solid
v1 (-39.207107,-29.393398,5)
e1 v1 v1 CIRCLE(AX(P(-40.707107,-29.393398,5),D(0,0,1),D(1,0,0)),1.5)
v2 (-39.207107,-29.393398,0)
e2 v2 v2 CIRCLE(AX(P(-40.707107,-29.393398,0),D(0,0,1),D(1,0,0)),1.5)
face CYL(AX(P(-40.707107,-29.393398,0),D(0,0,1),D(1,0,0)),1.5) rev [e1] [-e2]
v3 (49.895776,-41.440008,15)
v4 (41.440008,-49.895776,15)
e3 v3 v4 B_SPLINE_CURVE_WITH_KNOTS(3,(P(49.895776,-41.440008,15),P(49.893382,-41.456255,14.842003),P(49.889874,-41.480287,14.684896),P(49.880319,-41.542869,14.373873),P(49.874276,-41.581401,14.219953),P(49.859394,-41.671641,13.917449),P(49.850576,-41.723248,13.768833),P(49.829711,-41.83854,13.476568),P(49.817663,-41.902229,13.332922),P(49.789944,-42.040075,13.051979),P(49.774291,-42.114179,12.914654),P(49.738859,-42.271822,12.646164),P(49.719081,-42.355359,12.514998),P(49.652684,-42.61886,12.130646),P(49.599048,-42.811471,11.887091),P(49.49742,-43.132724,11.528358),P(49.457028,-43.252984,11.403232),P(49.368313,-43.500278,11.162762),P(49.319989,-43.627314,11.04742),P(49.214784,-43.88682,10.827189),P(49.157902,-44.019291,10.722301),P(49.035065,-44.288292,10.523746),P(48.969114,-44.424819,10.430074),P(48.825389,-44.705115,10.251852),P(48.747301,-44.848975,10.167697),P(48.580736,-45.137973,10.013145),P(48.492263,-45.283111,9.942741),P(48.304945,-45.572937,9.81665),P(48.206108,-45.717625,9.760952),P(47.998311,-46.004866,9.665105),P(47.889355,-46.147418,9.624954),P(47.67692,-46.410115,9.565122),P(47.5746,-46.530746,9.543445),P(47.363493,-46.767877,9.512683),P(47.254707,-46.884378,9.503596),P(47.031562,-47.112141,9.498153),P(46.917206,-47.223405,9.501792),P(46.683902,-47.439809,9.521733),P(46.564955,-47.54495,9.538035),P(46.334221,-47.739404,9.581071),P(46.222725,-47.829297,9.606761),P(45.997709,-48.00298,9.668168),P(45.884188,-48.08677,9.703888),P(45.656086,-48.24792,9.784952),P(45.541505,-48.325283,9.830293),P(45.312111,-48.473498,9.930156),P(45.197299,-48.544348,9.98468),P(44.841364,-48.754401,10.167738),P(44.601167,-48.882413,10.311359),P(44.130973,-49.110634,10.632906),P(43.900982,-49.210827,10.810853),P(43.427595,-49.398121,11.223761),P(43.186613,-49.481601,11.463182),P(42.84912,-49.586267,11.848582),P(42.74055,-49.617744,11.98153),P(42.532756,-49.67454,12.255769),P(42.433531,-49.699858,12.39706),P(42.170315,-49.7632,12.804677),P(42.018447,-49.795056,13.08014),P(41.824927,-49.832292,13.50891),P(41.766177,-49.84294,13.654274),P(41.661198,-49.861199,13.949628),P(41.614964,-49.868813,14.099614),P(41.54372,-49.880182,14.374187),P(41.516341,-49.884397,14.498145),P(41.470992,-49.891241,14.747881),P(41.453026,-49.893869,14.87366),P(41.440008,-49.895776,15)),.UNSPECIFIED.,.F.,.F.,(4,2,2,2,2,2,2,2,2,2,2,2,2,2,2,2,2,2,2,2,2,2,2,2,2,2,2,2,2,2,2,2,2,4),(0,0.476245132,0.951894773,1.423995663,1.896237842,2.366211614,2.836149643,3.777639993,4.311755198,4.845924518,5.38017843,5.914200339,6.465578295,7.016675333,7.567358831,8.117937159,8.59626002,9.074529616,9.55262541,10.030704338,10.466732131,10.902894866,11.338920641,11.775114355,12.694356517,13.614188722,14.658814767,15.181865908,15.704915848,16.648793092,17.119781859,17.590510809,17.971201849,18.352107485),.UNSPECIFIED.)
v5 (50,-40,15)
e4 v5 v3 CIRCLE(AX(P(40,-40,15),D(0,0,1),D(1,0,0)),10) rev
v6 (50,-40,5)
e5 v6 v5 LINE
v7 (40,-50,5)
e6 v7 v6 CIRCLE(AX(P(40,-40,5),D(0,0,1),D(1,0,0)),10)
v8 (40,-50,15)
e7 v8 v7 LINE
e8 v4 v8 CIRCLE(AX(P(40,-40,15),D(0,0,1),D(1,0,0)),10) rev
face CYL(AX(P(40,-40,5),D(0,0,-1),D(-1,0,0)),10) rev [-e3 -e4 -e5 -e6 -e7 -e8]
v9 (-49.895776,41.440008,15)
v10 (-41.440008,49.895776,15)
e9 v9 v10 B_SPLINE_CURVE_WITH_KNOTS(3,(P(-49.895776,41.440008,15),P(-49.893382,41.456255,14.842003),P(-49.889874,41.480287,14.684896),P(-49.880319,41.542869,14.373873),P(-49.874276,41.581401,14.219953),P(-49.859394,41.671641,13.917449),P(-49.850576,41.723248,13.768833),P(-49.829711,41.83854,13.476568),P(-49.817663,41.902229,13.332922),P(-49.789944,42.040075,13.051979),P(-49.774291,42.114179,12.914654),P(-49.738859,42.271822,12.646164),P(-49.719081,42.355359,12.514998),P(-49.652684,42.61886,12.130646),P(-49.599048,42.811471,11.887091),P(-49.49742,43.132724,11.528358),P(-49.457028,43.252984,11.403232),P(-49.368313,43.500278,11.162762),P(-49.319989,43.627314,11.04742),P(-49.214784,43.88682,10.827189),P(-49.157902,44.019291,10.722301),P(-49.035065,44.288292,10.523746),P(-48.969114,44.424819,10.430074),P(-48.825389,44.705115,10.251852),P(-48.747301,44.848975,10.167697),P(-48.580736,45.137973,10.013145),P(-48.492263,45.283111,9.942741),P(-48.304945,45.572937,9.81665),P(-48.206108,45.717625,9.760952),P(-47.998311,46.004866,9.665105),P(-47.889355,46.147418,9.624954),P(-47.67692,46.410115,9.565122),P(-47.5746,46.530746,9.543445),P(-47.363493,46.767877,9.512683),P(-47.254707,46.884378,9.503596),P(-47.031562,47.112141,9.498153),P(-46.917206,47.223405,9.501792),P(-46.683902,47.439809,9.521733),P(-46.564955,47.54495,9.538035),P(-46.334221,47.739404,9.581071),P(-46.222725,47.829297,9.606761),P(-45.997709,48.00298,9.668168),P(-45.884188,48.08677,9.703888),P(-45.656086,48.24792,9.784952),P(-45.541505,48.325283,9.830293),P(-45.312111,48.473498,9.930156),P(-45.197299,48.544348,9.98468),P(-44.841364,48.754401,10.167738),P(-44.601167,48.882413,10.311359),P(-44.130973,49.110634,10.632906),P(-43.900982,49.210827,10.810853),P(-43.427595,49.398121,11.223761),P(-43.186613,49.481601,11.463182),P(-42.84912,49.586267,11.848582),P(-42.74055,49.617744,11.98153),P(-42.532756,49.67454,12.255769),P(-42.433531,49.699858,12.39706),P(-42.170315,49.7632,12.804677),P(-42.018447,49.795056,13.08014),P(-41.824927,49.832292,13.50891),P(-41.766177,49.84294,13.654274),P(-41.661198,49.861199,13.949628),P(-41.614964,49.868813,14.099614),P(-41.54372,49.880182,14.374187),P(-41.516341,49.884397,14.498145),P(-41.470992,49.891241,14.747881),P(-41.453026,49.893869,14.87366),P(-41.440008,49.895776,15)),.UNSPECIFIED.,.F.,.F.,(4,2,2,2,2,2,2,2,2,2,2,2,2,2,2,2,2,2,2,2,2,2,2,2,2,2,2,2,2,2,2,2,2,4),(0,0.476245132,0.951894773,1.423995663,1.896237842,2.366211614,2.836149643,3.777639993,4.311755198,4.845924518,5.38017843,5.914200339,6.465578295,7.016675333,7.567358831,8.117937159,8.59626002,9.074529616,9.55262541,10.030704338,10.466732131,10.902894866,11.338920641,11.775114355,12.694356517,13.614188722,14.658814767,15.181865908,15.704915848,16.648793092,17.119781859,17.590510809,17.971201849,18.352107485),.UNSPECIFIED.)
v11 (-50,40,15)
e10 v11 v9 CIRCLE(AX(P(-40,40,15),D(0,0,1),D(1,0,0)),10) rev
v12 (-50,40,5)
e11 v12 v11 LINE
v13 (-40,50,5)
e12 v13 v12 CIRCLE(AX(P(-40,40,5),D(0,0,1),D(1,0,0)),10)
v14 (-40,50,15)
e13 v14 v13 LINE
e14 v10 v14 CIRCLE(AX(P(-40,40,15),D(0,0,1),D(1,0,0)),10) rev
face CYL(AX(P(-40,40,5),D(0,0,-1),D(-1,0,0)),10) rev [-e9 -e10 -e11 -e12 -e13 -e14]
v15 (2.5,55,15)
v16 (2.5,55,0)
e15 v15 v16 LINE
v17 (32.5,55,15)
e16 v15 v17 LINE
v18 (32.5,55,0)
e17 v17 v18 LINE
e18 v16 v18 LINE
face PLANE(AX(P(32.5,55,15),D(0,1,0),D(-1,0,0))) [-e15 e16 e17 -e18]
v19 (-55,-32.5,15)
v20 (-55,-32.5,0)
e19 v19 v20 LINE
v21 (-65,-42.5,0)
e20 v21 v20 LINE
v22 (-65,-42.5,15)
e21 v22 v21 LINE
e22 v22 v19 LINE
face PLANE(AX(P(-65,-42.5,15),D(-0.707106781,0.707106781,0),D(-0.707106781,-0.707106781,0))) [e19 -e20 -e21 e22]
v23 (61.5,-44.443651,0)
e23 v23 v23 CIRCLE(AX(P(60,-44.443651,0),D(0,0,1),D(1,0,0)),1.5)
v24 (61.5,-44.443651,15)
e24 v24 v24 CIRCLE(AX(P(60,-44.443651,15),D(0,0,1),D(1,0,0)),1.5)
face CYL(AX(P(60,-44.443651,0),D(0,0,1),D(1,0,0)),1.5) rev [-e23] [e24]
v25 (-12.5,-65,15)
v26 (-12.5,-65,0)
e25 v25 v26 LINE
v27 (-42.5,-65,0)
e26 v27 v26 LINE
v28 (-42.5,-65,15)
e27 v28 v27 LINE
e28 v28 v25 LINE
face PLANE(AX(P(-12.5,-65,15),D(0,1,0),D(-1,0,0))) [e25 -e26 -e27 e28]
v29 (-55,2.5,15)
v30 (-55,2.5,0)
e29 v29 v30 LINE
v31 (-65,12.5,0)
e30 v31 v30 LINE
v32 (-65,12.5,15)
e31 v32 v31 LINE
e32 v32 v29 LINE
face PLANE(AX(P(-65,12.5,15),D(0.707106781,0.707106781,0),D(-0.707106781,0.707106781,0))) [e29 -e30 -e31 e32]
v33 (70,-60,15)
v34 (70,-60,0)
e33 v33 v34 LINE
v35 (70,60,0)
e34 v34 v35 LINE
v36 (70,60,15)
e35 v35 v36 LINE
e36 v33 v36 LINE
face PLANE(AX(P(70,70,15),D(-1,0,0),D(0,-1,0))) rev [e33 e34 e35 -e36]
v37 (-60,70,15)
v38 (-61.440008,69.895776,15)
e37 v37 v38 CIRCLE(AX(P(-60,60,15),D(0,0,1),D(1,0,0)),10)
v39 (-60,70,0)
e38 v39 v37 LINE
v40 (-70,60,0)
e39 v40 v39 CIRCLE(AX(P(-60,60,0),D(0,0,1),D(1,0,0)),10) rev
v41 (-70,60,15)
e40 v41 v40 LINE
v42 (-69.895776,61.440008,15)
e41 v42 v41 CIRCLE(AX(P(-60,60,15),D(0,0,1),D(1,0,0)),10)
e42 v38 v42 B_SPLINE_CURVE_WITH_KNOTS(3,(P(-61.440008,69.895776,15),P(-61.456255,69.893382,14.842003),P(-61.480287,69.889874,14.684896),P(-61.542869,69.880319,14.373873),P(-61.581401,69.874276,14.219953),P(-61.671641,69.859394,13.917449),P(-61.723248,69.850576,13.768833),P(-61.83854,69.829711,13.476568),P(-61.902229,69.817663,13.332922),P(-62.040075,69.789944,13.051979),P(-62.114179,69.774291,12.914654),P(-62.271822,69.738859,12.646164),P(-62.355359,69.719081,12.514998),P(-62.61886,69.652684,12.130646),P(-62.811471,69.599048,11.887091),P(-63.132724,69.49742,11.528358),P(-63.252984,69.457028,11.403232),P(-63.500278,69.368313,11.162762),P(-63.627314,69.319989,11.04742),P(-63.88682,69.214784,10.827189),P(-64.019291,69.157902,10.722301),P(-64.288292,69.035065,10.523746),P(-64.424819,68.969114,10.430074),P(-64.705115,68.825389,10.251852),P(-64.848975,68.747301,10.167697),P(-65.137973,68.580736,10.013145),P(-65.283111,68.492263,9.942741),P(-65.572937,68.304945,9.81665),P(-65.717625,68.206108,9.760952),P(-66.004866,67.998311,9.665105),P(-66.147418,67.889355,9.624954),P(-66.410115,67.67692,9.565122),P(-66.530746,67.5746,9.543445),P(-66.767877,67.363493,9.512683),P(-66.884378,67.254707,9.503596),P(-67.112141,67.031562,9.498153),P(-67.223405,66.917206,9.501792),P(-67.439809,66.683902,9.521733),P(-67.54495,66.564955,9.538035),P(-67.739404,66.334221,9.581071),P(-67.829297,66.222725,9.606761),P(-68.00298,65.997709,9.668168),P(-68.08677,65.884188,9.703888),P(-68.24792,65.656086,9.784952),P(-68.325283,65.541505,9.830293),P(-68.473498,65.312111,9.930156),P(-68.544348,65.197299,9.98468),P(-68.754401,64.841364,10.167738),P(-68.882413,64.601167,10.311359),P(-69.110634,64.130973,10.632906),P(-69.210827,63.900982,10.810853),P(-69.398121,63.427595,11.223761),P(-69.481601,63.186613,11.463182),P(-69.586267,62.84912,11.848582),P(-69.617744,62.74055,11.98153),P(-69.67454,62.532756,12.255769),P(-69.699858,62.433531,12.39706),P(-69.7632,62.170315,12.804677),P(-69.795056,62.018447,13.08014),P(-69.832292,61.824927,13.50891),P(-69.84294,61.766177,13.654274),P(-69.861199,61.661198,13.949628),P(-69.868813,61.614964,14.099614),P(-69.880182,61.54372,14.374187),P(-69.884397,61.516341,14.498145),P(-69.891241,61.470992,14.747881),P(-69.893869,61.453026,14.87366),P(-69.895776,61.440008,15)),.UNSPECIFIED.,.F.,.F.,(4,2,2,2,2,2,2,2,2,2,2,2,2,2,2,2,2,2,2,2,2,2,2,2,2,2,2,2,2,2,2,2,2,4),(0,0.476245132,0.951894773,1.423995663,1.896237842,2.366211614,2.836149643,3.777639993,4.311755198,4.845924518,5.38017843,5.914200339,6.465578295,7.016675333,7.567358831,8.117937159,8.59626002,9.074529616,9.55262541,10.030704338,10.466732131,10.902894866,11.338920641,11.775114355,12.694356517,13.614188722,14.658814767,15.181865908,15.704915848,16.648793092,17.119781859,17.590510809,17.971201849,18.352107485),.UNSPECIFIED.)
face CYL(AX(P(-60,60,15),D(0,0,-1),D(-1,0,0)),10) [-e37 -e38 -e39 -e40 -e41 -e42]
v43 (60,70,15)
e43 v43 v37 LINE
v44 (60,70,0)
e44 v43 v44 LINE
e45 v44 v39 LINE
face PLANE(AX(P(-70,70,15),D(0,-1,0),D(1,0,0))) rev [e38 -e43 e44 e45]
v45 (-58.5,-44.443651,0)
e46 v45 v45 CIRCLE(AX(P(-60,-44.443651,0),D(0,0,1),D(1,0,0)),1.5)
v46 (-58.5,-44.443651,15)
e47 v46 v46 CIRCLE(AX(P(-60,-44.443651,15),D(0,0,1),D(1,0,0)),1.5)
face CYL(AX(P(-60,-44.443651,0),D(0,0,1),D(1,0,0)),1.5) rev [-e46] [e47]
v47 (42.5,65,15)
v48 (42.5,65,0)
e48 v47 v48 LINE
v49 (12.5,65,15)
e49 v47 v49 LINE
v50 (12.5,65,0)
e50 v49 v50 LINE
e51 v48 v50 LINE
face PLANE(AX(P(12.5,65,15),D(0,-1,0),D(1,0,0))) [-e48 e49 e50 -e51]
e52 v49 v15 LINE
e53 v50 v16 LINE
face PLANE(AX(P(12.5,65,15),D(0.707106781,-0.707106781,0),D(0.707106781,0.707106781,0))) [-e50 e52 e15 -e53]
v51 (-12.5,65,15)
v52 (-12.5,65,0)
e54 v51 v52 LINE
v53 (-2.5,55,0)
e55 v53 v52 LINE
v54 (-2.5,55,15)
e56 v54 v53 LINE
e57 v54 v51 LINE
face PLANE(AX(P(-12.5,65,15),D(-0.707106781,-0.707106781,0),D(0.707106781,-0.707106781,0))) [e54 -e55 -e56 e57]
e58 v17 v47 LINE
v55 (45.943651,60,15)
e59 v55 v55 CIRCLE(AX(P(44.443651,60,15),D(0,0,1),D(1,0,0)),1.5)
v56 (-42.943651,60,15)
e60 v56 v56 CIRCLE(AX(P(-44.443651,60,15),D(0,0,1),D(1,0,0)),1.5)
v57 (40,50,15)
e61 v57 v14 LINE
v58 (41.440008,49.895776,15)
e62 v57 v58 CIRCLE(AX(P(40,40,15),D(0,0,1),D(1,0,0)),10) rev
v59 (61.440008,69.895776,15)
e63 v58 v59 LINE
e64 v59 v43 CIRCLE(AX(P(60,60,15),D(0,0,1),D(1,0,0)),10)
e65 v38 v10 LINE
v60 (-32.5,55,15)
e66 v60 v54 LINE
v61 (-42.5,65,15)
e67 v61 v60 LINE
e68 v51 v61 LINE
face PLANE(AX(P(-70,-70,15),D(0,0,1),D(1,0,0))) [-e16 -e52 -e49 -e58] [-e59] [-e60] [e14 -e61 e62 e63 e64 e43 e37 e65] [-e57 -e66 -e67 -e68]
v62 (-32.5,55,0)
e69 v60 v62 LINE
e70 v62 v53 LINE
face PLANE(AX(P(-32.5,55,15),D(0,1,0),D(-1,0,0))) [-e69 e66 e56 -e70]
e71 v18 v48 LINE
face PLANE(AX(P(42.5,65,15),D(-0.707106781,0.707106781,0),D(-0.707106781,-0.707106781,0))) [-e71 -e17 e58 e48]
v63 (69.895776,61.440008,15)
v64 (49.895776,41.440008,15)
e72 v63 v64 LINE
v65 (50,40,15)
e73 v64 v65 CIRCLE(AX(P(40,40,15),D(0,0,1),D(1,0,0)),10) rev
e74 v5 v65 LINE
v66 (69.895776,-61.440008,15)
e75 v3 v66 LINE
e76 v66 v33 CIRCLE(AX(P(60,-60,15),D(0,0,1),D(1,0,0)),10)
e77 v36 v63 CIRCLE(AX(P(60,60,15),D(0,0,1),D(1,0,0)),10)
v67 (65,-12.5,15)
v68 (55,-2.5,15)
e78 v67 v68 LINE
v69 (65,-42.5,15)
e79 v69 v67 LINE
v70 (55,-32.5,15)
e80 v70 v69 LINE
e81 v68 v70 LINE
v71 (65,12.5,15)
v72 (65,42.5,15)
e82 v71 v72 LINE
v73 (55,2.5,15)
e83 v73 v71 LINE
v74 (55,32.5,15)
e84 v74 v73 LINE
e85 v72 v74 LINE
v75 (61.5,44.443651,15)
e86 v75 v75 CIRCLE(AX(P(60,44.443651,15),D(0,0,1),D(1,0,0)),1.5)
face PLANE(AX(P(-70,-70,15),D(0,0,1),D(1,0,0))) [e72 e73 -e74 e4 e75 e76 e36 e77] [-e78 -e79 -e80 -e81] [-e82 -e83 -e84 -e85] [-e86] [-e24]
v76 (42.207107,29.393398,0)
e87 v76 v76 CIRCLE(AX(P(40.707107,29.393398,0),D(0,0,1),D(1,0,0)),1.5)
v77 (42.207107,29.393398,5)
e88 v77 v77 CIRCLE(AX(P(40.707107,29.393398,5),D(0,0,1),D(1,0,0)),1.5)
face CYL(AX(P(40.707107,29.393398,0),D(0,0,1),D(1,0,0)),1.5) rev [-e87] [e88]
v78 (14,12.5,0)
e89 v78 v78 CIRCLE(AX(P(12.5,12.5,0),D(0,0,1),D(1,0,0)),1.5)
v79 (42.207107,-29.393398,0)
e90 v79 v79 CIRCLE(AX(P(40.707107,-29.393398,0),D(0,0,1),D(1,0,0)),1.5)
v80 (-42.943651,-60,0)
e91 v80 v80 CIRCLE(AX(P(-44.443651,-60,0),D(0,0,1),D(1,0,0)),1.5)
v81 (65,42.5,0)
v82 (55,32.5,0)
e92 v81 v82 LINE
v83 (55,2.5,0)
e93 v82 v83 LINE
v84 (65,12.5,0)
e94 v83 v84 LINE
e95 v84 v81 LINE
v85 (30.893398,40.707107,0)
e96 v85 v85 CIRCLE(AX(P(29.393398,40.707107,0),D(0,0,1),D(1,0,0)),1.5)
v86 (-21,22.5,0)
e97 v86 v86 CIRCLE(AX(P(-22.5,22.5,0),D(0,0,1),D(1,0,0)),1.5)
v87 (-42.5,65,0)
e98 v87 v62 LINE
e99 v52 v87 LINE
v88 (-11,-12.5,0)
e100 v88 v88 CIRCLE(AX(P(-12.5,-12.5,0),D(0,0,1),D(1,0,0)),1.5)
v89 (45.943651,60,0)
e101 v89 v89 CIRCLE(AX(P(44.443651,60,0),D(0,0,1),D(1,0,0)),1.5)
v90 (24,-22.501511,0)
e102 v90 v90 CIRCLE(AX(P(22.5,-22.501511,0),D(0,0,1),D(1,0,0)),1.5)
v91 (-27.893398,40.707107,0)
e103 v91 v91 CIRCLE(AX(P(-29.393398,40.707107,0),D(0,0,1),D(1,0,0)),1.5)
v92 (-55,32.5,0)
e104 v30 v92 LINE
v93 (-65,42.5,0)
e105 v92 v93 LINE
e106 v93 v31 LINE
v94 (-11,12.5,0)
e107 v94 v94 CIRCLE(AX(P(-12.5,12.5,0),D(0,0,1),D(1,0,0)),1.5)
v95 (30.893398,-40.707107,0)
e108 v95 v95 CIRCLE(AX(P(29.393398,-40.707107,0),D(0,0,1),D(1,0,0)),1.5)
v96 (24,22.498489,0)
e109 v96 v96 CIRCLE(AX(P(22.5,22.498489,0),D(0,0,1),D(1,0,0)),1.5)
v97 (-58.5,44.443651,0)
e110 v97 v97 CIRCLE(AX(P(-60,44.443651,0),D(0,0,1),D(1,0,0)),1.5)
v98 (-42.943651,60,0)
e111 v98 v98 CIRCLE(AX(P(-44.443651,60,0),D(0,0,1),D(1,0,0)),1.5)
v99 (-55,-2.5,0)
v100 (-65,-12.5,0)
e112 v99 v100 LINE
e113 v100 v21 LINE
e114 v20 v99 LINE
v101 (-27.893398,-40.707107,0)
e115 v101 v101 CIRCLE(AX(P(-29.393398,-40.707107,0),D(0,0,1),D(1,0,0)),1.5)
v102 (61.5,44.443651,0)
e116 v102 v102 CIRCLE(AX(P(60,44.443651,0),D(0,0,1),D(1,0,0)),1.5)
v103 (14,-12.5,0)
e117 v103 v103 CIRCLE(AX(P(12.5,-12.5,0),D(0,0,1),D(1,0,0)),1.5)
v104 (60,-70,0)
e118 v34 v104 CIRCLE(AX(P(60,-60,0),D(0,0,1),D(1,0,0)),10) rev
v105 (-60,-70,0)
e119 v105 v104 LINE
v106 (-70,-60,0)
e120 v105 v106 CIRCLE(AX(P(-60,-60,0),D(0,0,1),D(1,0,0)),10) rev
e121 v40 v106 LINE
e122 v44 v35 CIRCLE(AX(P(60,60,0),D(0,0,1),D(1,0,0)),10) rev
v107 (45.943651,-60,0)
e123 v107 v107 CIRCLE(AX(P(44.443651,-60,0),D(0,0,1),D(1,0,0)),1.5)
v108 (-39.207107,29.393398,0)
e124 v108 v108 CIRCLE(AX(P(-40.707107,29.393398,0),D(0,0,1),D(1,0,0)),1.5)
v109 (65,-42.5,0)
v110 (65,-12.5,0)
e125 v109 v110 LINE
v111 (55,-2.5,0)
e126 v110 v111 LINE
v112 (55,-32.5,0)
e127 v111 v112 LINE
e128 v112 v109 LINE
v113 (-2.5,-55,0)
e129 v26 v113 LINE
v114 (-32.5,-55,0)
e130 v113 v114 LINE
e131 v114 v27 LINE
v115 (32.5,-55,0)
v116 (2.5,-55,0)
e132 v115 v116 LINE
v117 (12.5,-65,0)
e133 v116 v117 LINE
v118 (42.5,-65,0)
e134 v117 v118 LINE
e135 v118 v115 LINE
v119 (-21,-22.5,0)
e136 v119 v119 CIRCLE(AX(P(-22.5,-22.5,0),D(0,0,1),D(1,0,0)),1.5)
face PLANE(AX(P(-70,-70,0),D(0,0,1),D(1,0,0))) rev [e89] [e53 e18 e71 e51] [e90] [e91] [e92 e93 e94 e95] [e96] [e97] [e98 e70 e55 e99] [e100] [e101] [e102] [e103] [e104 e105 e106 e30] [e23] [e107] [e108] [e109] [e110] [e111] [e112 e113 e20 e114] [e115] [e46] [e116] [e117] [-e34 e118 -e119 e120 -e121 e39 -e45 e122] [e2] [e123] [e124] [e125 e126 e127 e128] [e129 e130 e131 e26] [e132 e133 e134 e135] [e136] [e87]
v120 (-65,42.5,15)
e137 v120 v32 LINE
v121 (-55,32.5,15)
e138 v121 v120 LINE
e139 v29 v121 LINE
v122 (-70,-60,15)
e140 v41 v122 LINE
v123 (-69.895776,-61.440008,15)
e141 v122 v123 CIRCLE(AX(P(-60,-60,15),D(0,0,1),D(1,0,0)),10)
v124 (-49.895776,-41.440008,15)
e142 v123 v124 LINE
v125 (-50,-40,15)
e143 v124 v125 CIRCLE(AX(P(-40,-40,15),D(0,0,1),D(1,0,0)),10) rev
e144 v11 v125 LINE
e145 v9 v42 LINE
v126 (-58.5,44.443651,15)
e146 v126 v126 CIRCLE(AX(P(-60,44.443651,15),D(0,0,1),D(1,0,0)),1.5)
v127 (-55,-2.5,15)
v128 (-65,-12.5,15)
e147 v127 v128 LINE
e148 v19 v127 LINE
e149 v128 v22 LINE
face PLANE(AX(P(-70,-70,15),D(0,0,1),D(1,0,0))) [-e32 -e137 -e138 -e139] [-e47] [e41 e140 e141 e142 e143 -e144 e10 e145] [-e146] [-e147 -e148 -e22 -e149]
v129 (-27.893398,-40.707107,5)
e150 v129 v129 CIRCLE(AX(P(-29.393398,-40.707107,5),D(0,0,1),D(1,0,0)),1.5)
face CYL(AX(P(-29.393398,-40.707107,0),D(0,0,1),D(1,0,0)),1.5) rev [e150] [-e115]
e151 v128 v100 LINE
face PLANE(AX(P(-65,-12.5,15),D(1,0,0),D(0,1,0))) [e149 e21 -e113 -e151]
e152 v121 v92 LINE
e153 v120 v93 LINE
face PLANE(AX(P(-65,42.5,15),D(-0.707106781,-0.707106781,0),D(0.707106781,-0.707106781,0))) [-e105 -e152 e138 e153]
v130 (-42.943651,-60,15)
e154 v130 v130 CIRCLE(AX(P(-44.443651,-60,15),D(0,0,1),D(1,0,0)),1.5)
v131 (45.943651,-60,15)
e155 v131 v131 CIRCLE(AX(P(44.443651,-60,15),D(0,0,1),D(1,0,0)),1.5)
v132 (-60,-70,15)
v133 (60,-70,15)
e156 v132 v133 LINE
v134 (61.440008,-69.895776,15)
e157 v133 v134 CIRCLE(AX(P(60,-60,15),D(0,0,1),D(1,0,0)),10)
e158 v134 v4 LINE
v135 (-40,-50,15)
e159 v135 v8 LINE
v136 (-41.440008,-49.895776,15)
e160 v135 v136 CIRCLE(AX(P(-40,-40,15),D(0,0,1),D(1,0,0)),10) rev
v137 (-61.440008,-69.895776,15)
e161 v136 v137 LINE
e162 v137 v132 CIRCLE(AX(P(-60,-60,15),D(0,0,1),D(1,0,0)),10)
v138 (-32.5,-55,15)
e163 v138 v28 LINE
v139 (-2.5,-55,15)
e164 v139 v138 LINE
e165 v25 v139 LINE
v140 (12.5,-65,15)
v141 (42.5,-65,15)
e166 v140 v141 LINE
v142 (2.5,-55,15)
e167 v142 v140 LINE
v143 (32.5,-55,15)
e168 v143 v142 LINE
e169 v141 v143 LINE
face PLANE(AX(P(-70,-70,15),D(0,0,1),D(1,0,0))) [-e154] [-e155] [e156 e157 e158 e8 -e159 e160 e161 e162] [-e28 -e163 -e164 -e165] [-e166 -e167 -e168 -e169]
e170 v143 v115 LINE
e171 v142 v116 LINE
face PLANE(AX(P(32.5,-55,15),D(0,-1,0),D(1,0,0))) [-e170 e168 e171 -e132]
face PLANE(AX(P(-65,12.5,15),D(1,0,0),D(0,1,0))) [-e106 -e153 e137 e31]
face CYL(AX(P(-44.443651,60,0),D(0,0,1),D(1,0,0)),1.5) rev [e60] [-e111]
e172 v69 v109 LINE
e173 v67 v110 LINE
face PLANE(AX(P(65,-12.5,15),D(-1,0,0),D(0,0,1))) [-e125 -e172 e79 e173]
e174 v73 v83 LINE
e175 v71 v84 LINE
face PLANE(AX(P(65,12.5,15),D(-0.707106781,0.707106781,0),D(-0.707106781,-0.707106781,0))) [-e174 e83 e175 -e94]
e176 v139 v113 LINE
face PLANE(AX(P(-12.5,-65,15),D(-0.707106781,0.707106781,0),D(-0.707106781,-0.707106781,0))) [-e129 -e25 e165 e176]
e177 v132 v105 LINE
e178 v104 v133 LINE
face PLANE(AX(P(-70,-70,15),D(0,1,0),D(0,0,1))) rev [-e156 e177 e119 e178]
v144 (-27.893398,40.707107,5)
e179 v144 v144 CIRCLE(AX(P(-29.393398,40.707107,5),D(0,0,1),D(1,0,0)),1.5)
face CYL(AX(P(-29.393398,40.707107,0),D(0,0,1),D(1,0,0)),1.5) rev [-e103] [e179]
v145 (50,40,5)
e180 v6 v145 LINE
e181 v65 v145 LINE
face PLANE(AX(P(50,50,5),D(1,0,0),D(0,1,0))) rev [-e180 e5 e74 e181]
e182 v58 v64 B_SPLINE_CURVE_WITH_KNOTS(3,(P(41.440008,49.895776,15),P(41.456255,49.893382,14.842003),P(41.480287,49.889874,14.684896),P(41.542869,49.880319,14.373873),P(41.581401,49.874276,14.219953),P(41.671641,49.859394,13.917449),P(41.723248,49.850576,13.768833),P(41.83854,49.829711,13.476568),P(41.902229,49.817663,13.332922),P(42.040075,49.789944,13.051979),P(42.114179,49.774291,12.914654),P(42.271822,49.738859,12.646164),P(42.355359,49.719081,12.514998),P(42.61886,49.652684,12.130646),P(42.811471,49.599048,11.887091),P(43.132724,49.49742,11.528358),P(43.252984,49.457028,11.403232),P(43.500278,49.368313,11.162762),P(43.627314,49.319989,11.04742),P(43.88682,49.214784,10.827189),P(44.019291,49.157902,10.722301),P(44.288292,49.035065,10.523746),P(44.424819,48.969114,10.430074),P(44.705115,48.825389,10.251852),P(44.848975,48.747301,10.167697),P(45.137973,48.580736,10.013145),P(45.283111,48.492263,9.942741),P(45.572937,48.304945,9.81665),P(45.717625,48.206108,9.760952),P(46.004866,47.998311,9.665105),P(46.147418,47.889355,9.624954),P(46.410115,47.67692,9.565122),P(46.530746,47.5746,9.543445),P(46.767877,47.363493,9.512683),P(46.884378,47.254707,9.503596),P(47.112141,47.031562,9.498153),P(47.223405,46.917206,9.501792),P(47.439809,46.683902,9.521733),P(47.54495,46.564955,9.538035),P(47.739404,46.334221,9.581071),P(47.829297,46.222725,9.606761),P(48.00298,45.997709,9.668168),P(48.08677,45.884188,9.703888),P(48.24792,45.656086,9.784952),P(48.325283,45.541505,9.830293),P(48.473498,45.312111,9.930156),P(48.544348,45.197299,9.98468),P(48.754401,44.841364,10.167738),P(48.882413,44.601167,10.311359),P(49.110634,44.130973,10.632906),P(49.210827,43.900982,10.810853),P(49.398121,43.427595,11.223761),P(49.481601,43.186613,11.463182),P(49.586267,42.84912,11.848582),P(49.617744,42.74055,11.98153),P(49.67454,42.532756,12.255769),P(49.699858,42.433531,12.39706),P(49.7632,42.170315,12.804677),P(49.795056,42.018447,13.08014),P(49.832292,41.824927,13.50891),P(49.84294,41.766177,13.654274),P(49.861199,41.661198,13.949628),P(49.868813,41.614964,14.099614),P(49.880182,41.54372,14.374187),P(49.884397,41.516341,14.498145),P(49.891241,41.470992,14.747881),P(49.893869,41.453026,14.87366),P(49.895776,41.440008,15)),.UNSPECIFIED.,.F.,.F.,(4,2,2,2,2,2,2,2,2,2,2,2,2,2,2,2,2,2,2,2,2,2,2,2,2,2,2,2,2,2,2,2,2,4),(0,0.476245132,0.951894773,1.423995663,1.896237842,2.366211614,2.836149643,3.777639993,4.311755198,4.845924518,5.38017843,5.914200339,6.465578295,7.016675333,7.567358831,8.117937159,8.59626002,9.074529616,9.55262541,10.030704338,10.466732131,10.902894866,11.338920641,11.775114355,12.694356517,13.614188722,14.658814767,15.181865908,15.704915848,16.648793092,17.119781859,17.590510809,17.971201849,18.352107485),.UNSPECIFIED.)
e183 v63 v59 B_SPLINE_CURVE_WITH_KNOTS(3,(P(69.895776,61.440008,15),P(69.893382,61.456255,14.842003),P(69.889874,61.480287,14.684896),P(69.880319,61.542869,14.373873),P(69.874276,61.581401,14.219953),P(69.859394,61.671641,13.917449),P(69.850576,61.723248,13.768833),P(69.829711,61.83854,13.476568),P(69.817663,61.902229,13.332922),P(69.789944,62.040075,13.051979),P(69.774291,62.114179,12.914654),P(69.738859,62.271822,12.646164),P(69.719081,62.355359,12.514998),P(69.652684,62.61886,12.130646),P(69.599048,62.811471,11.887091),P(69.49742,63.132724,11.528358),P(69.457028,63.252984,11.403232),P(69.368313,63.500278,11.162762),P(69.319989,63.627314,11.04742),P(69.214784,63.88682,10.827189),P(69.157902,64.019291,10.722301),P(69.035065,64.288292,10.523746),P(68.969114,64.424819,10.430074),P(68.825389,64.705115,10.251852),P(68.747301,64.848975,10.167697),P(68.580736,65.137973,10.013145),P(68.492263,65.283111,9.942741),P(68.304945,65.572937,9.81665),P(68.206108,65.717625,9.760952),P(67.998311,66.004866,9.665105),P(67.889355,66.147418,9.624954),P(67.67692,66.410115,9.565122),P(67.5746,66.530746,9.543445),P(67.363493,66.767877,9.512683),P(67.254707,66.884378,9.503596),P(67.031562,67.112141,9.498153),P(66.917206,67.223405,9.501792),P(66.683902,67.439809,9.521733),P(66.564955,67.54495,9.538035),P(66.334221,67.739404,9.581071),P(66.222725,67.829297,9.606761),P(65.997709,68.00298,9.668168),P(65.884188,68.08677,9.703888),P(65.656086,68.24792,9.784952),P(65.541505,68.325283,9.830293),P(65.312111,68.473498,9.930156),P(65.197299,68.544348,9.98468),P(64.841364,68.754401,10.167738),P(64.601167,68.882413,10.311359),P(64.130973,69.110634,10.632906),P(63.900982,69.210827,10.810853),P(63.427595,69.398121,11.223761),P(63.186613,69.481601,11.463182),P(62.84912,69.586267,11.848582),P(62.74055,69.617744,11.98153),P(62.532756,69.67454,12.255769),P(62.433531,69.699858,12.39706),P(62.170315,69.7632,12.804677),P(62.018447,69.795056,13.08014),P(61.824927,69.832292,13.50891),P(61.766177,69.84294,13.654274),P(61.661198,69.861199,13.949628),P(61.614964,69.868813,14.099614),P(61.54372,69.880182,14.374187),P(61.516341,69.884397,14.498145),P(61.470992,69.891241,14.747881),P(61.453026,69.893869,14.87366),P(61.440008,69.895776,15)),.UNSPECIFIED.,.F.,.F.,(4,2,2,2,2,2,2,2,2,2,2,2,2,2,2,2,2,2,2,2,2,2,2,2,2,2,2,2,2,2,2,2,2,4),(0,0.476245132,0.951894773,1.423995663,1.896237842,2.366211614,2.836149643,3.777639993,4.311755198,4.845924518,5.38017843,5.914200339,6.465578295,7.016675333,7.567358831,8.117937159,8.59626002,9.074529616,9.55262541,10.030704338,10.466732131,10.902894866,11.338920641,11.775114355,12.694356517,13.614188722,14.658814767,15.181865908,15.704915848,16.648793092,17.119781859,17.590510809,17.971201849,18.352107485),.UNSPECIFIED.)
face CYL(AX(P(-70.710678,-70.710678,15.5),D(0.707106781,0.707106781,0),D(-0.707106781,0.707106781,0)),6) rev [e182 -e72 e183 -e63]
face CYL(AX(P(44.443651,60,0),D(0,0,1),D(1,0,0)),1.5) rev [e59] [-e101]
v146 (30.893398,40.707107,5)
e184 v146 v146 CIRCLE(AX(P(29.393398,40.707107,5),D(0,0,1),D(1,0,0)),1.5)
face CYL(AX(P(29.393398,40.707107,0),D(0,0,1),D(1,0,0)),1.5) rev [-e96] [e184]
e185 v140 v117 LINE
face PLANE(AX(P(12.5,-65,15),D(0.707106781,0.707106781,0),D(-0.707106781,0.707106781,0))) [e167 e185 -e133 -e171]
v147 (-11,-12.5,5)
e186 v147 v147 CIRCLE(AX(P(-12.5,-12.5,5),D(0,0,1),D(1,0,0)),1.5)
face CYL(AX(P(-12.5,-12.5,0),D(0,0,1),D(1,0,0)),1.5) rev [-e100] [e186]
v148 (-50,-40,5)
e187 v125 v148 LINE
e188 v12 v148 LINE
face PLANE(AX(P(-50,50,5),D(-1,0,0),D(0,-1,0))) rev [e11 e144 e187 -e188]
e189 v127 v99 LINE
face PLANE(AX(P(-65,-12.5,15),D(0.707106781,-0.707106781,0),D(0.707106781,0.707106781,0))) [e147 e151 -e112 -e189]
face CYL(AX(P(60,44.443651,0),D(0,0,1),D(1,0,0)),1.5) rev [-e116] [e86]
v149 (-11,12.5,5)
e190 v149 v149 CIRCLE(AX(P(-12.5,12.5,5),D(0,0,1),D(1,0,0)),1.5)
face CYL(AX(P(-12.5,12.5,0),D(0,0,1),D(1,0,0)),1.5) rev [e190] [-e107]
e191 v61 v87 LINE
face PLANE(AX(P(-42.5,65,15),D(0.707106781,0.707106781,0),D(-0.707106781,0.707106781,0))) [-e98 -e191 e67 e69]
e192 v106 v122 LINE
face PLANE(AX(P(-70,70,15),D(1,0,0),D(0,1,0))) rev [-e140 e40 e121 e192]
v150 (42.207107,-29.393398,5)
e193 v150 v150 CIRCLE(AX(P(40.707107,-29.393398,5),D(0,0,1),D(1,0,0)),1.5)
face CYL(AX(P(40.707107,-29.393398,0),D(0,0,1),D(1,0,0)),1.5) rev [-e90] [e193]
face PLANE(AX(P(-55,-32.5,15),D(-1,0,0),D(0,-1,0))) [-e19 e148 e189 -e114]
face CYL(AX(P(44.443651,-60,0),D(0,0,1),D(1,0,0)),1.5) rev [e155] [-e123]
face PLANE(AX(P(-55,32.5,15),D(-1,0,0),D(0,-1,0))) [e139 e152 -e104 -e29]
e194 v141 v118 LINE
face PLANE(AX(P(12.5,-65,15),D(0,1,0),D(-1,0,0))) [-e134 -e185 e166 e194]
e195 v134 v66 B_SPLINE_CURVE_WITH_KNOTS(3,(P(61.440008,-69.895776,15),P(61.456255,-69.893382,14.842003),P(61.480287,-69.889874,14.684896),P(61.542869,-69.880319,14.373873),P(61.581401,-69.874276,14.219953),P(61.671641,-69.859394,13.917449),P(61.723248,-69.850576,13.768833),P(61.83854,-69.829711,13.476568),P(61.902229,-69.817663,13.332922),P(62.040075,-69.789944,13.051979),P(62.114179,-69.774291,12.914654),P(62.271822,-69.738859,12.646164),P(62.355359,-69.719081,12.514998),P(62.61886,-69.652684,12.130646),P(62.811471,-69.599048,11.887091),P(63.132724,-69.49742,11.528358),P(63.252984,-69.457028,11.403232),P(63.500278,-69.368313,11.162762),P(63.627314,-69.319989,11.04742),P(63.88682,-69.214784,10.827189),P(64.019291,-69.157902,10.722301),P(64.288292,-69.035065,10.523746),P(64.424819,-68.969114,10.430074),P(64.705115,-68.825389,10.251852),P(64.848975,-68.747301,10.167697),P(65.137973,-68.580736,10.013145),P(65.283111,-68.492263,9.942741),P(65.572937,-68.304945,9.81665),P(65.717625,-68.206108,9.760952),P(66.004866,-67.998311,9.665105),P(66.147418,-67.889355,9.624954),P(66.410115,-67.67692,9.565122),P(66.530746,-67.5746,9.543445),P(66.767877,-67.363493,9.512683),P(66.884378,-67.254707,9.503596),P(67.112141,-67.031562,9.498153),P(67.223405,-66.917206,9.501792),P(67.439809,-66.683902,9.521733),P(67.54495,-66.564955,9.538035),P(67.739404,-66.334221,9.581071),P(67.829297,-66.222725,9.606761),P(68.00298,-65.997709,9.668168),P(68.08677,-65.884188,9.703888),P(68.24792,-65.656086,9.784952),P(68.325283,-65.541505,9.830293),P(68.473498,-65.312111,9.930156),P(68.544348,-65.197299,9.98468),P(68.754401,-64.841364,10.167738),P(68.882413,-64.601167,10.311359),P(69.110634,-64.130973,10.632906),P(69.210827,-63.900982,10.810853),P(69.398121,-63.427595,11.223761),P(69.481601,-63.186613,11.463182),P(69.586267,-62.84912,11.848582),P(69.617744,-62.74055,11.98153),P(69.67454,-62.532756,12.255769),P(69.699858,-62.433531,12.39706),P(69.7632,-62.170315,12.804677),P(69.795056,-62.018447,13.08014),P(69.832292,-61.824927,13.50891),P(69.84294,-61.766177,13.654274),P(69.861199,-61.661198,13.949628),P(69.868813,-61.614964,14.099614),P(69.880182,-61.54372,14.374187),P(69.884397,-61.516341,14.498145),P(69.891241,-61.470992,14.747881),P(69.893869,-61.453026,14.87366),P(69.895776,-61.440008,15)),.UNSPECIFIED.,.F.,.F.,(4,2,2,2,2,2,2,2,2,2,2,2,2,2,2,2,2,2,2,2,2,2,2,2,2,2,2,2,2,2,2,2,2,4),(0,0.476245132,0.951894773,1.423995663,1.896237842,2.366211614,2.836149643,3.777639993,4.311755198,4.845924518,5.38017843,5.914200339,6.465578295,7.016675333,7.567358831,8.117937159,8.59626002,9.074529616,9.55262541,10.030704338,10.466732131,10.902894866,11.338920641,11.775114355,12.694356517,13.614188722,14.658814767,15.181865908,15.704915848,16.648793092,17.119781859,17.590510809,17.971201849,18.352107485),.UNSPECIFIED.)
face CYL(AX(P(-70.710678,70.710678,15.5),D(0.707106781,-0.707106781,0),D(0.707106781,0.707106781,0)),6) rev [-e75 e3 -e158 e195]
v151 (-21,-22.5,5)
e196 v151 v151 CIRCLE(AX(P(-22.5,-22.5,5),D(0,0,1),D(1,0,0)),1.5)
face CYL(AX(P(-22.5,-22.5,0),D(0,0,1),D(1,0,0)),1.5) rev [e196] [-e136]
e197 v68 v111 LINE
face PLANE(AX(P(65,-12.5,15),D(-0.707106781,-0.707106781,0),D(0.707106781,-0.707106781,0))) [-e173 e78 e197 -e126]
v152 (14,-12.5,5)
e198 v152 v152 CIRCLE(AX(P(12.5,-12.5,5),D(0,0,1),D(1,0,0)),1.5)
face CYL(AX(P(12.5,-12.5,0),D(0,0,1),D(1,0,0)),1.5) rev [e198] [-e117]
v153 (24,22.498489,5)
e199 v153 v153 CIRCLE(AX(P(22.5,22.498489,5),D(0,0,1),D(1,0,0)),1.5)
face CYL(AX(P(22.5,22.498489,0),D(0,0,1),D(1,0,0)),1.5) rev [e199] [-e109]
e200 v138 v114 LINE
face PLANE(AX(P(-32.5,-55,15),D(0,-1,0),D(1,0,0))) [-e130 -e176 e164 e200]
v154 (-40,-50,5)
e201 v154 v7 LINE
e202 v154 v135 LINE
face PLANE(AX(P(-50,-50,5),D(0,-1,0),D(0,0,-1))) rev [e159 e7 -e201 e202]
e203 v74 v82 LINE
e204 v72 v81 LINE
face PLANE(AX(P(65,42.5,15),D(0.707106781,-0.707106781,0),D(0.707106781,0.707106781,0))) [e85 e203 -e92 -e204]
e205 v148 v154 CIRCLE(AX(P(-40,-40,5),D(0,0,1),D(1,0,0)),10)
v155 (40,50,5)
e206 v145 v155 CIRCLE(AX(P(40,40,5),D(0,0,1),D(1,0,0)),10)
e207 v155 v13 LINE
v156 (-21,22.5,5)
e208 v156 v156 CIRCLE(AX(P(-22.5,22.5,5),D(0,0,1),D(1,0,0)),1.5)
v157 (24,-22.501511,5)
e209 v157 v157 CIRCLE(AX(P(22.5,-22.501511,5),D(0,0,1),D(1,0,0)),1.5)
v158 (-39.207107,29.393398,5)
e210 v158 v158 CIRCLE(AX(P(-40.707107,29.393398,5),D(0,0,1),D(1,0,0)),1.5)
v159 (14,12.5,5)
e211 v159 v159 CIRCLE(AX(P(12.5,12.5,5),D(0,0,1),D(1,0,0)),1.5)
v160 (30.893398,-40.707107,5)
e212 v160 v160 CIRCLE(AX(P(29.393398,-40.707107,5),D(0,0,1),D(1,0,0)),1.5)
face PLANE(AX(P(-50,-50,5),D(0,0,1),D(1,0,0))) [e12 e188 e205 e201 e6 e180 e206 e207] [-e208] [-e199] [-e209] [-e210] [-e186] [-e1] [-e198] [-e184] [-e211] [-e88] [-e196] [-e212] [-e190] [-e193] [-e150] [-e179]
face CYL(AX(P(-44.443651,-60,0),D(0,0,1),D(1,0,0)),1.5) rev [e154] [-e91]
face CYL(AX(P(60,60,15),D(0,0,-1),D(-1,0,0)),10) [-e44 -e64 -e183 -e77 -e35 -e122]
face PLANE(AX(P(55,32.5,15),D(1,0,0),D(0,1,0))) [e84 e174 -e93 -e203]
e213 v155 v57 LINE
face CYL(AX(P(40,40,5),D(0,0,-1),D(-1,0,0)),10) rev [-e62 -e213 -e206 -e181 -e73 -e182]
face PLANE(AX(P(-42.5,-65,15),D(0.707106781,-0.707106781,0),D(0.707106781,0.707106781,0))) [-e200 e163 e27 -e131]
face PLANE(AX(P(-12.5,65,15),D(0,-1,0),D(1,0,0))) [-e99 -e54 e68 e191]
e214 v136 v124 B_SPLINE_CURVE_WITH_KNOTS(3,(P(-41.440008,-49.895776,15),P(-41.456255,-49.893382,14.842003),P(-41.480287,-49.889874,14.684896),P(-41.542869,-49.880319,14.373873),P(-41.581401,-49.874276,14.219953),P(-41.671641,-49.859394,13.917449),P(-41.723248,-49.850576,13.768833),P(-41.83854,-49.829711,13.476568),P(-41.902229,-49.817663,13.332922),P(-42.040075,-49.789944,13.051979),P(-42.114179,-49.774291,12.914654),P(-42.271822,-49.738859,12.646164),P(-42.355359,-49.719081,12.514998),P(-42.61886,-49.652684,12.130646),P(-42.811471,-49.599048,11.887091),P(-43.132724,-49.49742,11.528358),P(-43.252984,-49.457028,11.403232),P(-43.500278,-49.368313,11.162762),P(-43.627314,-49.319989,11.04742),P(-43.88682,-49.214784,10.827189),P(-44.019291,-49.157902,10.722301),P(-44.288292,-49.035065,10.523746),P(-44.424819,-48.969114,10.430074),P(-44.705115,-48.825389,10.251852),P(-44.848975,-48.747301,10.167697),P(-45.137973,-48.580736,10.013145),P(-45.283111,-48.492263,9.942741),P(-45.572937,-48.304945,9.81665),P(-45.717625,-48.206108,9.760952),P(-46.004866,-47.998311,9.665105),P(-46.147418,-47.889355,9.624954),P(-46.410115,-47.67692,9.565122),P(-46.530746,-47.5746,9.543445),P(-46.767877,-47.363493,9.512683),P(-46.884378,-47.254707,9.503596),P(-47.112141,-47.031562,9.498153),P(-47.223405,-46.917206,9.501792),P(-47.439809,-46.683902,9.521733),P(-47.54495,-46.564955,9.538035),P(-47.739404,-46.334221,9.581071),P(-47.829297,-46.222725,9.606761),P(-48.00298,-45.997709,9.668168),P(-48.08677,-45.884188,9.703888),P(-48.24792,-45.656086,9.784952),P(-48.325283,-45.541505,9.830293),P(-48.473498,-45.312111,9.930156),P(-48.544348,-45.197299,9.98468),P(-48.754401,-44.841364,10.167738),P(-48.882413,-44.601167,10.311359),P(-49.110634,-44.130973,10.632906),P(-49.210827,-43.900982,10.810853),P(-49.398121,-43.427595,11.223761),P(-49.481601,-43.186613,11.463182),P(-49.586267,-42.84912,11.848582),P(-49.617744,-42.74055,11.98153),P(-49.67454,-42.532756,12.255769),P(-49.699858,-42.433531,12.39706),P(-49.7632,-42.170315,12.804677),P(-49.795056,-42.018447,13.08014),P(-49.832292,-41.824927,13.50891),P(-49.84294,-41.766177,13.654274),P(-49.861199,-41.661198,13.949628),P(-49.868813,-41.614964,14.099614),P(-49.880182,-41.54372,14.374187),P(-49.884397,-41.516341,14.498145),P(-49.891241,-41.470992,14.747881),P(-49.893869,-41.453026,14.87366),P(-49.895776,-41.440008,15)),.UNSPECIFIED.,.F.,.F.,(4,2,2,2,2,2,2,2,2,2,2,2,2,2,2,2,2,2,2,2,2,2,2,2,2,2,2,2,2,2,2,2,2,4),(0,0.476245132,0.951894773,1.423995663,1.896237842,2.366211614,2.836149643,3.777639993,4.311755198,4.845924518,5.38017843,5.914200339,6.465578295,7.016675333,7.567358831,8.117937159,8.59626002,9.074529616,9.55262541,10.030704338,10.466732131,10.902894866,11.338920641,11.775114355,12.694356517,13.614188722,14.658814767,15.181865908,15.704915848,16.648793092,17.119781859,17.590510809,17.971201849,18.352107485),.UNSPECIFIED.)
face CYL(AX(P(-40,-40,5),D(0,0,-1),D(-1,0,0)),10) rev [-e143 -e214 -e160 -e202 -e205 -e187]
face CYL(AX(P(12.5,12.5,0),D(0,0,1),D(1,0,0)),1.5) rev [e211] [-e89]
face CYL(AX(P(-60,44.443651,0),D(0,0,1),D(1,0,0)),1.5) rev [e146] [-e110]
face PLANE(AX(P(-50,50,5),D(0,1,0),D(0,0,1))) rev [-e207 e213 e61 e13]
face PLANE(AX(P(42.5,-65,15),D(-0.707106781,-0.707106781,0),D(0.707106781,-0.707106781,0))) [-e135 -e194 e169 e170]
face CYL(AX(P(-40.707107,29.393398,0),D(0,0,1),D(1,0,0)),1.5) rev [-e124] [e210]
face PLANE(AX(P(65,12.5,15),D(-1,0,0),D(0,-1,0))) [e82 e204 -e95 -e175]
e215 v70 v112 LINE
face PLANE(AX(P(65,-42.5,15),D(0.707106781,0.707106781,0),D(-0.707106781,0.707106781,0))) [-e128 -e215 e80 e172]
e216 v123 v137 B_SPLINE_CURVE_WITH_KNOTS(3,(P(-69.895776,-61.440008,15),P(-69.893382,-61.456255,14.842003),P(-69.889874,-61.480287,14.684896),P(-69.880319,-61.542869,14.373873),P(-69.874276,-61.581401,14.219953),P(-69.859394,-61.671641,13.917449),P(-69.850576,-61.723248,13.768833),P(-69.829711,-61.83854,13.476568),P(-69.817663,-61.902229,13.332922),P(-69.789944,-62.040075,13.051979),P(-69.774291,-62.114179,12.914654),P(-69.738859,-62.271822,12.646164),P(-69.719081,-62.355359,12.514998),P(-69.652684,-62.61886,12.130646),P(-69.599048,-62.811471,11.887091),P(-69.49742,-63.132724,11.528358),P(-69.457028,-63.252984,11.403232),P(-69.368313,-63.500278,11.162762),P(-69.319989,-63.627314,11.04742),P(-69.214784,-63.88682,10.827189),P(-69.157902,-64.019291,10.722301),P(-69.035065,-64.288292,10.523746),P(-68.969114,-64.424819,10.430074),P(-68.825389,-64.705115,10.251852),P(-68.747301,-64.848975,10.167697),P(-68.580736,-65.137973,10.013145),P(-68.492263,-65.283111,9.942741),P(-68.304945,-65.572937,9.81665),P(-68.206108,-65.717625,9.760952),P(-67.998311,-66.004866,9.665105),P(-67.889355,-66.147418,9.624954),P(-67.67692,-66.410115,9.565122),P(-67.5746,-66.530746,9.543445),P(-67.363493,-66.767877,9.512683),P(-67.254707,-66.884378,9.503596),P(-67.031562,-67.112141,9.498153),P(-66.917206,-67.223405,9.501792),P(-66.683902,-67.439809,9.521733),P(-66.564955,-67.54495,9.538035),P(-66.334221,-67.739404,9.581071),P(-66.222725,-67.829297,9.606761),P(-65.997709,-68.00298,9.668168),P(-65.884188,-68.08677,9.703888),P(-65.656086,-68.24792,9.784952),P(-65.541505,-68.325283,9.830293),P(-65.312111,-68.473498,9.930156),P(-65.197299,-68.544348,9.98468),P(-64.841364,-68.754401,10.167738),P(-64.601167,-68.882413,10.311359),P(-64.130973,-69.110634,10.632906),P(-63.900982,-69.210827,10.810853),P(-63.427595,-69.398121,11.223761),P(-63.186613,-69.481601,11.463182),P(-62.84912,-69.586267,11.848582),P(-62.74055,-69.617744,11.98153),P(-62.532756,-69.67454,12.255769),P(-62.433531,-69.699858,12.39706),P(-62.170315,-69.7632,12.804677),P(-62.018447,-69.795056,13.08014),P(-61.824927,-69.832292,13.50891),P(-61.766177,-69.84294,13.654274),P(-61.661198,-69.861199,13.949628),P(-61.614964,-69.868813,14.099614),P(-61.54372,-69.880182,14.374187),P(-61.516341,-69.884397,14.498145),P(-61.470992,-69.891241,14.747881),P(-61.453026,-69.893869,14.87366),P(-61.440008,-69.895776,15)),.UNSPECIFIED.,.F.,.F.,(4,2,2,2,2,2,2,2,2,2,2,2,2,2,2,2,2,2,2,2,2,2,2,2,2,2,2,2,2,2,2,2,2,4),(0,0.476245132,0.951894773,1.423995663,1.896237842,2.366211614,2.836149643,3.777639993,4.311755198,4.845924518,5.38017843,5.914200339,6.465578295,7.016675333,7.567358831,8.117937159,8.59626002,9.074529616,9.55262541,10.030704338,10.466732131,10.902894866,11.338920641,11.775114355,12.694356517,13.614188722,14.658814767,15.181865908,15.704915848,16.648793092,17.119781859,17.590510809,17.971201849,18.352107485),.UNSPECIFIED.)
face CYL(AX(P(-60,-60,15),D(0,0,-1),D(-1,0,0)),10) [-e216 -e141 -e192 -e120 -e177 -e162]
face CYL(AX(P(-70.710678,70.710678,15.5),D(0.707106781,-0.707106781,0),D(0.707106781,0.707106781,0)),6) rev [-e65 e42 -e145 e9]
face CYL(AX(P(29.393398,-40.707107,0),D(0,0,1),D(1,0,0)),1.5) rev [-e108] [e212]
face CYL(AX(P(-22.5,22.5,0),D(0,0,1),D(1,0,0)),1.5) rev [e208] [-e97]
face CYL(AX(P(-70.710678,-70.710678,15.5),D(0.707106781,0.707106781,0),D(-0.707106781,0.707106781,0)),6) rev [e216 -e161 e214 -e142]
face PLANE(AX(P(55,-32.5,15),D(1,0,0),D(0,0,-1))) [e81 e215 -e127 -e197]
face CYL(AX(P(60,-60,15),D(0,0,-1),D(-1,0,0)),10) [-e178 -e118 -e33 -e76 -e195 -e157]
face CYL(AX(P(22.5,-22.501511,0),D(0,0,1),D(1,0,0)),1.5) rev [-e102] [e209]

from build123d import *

# Parameters (mm, degrees)
ESQUISSE1_W                  = 140
ESQUISSE1_H                  = 140
BOSS_EXTRU_1_DEPTH           = 15
ESQUISSE4_W                  = 100
ESQUISSE4_H                  = 100
ENL_V_MAT_EXTRU_3_DEPTH      = 10
ENL_V_MAT_EXTRU_1_DEPTH      = 100
R_P_TITION_CIRCULAIRE1_COUNT = 2
R_P_TITION_CIRCULAIRE1_ANGLE = 90
CONG_1_R                     = 10
ESQUISSE3_R                  = 1.5
ENL_V_MAT_EXTRU_2_DEPTH      = 15
ESQUISSE5_R                  = 1.5
ENL_V_MAT_EXTRU_4_DEPTH      = 5


with BuildPart() as part:
    # Esquisse1 → Boss.-Extru.1 (new body)
    with BuildSketch(Plane.XY):
        Rectangle(ESQUISSE1_W, ESQUISSE1_H)
        Polygon((65, 12.5), (55, 2.5), (55, 32.5), (65, 42.5), align=None, mode=Mode.SUBTRACT)
        Polygon((65, -12.5), (55, -2.5), (55, -32.5), (65, -42.5), align=None, mode=Mode.SUBTRACT)
        Polygon((12.5, -65), (2.5, -55), (32.5, -55), (42.5, -65), align=None, mode=Mode.SUBTRACT)
        Polygon((-12.5, -65), (-2.5, -55), (-32.5, -55), (-42.5, -65), align=None, mode=Mode.SUBTRACT)
        Polygon((-65, -12.5), (-55, -2.5), (-55, -32.5), (-65, -42.5), align=None, mode=Mode.SUBTRACT)
        Polygon((-65, 12.5), (-55, 2.5), (-55, 32.5), (-65, 42.5), align=None, mode=Mode.SUBTRACT)
        Polygon((-12.5, 65), (-2.5, 55), (-32.5, 55), (-42.5, 65), align=None, mode=Mode.SUBTRACT)
        Polygon((12.5, 65), (2.5, 55), (32.5, 55), (42.5, 65), align=None, mode=Mode.SUBTRACT)
    extrude(amount=BOSS_EXTRU_1_DEPTH)

    # Esquisse4 → Enlèv. mat.-Extru.3 (cut)
    with BuildSketch(Plane.XY.offset(15)):
        Rectangle(ESQUISSE4_W, ESQUISSE4_H)
    extrude(amount=-ENL_V_MAT_EXTRU_3_DEPTH, mode=Mode.SUBTRACT)

    # Esquisse2 → Enlèv. mat.-Extru.1 (cut, symmetric)
    with BuildSketch(Plane(origin=(0, 0, 0), x_dir=(-0.7071067811865475, -0.7071067811865477, 0), z_dir=(-0.7071067811865477, 0.7071067811865475, 0))):
        with BuildLine():
            Line((-6, 15.5), (6, 15.5))
            ThreePointArc((6, 15.5), (0, 9.5), (-6, 15.5))
        make_face()
    enl_v_mat_extru_1 = extrude(amount=ENL_V_MAT_EXTRU_1_DEPTH, both=True, mode=Mode.SUBTRACT)

    # Répétition circulaire1: Enlèv. mat.-Extru.1 ×2 about axis
    r_p_tition_circulaire1_axis = Axis((0, 0, -62.841973852), (0, 0, 1))
    for i in range(1, R_P_TITION_CIRCULAIRE1_COUNT):
        add(enl_v_mat_extru_1.rotate(r_p_tition_circulaire1_axis, i * R_P_TITION_CIRCULAIRE1_ANGLE / (R_P_TITION_CIRCULAIRE1_COUNT - 1)), mode=Mode.SUBTRACT)

    # Congé1
    cong_1_edges = [part.edges().sort_by_distance(p)[0] for p in [
        (50, -50, 7.25),
        (-50, -50, 7.25),
        (50, 50, 7.25),
        (-50, 50, 7.25),
    ]]
    fillet(cong_1_edges, radius=CONG_1_R)
    cong_1_2_edges = [part.edges().sort_by_distance(p)[0] for p in [
        (-70, 70, 4.75),
        (-70, -70, 4.75),
        (70, 70, 4.75),
        (70, -70, 4.75),
    ]]
    fillet(cong_1_2_edges, radius=CONG_1_R)

    # Esquisse3 → Enlèv. mat.-Extru.2 (cut)
    with BuildSketch(Plane.XY.offset(15)):
        with Locations((-60, -44.443650814)):
            Circle(ESQUISSE3_R)
        with Locations((-44.443650814, -60)):
            Circle(ESQUISSE3_R)
        with Locations((-44.443650814, 60)):
            Circle(ESQUISSE3_R)
        with Locations((-60, 44.443650814)):
            Circle(ESQUISSE3_R)
        with Locations((60, 44.443650814)):
            Circle(ESQUISSE3_R)
        with Locations((44.443650814, 60)):
            Circle(ESQUISSE3_R)
        with Locations((44.443650814, -60)):
            Circle(ESQUISSE3_R)
        with Locations((60, -44.443650814)):
            Circle(ESQUISSE3_R)
    extrude(amount=-ENL_V_MAT_EXTRU_2_DEPTH, mode=Mode.SUBTRACT)

    # Esquisse5 → Enlèv. mat.-Extru.4 (cut)
    with BuildSketch(Plane.XY.offset(5)):
        with Locations((-22.5, 22.5)):
            Circle(ESQUISSE5_R)
        with Locations((22.499999975, 22.498488866)):
            Circle(ESQUISSE5_R)
        with Locations((-22.500000025, -22.5)):
            Circle(ESQUISSE5_R)
        with Locations((22.499999975, -22.501511134)):
            Circle(ESQUISSE5_R)
        with Locations((-12.5, 12.5)):
            Circle(ESQUISSE5_R)
        with Locations((12.5, 12.5)):
            Circle(ESQUISSE5_R)
        with Locations((12.5, -12.5)):
            Circle(ESQUISSE5_R)
        with Locations((-12.5, -12.5)):
            Circle(ESQUISSE5_R)
        with Locations((29.393398282, 40.707106781)):
            Circle(ESQUISSE5_R)
        with Locations((40.707106781, 29.393398282)):
            Circle(ESQUISSE5_R)
        with Locations((40.707106781, -29.393398282)):
            Circle(ESQUISSE5_R)
        with Locations((29.393398282, -40.707106781)):
            Circle(ESQUISSE5_R)
        with Locations((-29.393398282, -40.707106781)):
            Circle(ESQUISSE5_R)
        with Locations((-40.707106781, -29.393398282)):
            Circle(ESQUISSE5_R)
        with Locations((-40.707106781, 29.393398282)):
            Circle(ESQUISSE5_R)
        with Locations((-29.393398282, 40.707106781)):
            Circle(ESQUISSE5_R)
    extrude(amount=-ENL_V_MAT_EXTRU_4_DEPTH, mode=Mode.SUBTRACT)


solid = part.part
